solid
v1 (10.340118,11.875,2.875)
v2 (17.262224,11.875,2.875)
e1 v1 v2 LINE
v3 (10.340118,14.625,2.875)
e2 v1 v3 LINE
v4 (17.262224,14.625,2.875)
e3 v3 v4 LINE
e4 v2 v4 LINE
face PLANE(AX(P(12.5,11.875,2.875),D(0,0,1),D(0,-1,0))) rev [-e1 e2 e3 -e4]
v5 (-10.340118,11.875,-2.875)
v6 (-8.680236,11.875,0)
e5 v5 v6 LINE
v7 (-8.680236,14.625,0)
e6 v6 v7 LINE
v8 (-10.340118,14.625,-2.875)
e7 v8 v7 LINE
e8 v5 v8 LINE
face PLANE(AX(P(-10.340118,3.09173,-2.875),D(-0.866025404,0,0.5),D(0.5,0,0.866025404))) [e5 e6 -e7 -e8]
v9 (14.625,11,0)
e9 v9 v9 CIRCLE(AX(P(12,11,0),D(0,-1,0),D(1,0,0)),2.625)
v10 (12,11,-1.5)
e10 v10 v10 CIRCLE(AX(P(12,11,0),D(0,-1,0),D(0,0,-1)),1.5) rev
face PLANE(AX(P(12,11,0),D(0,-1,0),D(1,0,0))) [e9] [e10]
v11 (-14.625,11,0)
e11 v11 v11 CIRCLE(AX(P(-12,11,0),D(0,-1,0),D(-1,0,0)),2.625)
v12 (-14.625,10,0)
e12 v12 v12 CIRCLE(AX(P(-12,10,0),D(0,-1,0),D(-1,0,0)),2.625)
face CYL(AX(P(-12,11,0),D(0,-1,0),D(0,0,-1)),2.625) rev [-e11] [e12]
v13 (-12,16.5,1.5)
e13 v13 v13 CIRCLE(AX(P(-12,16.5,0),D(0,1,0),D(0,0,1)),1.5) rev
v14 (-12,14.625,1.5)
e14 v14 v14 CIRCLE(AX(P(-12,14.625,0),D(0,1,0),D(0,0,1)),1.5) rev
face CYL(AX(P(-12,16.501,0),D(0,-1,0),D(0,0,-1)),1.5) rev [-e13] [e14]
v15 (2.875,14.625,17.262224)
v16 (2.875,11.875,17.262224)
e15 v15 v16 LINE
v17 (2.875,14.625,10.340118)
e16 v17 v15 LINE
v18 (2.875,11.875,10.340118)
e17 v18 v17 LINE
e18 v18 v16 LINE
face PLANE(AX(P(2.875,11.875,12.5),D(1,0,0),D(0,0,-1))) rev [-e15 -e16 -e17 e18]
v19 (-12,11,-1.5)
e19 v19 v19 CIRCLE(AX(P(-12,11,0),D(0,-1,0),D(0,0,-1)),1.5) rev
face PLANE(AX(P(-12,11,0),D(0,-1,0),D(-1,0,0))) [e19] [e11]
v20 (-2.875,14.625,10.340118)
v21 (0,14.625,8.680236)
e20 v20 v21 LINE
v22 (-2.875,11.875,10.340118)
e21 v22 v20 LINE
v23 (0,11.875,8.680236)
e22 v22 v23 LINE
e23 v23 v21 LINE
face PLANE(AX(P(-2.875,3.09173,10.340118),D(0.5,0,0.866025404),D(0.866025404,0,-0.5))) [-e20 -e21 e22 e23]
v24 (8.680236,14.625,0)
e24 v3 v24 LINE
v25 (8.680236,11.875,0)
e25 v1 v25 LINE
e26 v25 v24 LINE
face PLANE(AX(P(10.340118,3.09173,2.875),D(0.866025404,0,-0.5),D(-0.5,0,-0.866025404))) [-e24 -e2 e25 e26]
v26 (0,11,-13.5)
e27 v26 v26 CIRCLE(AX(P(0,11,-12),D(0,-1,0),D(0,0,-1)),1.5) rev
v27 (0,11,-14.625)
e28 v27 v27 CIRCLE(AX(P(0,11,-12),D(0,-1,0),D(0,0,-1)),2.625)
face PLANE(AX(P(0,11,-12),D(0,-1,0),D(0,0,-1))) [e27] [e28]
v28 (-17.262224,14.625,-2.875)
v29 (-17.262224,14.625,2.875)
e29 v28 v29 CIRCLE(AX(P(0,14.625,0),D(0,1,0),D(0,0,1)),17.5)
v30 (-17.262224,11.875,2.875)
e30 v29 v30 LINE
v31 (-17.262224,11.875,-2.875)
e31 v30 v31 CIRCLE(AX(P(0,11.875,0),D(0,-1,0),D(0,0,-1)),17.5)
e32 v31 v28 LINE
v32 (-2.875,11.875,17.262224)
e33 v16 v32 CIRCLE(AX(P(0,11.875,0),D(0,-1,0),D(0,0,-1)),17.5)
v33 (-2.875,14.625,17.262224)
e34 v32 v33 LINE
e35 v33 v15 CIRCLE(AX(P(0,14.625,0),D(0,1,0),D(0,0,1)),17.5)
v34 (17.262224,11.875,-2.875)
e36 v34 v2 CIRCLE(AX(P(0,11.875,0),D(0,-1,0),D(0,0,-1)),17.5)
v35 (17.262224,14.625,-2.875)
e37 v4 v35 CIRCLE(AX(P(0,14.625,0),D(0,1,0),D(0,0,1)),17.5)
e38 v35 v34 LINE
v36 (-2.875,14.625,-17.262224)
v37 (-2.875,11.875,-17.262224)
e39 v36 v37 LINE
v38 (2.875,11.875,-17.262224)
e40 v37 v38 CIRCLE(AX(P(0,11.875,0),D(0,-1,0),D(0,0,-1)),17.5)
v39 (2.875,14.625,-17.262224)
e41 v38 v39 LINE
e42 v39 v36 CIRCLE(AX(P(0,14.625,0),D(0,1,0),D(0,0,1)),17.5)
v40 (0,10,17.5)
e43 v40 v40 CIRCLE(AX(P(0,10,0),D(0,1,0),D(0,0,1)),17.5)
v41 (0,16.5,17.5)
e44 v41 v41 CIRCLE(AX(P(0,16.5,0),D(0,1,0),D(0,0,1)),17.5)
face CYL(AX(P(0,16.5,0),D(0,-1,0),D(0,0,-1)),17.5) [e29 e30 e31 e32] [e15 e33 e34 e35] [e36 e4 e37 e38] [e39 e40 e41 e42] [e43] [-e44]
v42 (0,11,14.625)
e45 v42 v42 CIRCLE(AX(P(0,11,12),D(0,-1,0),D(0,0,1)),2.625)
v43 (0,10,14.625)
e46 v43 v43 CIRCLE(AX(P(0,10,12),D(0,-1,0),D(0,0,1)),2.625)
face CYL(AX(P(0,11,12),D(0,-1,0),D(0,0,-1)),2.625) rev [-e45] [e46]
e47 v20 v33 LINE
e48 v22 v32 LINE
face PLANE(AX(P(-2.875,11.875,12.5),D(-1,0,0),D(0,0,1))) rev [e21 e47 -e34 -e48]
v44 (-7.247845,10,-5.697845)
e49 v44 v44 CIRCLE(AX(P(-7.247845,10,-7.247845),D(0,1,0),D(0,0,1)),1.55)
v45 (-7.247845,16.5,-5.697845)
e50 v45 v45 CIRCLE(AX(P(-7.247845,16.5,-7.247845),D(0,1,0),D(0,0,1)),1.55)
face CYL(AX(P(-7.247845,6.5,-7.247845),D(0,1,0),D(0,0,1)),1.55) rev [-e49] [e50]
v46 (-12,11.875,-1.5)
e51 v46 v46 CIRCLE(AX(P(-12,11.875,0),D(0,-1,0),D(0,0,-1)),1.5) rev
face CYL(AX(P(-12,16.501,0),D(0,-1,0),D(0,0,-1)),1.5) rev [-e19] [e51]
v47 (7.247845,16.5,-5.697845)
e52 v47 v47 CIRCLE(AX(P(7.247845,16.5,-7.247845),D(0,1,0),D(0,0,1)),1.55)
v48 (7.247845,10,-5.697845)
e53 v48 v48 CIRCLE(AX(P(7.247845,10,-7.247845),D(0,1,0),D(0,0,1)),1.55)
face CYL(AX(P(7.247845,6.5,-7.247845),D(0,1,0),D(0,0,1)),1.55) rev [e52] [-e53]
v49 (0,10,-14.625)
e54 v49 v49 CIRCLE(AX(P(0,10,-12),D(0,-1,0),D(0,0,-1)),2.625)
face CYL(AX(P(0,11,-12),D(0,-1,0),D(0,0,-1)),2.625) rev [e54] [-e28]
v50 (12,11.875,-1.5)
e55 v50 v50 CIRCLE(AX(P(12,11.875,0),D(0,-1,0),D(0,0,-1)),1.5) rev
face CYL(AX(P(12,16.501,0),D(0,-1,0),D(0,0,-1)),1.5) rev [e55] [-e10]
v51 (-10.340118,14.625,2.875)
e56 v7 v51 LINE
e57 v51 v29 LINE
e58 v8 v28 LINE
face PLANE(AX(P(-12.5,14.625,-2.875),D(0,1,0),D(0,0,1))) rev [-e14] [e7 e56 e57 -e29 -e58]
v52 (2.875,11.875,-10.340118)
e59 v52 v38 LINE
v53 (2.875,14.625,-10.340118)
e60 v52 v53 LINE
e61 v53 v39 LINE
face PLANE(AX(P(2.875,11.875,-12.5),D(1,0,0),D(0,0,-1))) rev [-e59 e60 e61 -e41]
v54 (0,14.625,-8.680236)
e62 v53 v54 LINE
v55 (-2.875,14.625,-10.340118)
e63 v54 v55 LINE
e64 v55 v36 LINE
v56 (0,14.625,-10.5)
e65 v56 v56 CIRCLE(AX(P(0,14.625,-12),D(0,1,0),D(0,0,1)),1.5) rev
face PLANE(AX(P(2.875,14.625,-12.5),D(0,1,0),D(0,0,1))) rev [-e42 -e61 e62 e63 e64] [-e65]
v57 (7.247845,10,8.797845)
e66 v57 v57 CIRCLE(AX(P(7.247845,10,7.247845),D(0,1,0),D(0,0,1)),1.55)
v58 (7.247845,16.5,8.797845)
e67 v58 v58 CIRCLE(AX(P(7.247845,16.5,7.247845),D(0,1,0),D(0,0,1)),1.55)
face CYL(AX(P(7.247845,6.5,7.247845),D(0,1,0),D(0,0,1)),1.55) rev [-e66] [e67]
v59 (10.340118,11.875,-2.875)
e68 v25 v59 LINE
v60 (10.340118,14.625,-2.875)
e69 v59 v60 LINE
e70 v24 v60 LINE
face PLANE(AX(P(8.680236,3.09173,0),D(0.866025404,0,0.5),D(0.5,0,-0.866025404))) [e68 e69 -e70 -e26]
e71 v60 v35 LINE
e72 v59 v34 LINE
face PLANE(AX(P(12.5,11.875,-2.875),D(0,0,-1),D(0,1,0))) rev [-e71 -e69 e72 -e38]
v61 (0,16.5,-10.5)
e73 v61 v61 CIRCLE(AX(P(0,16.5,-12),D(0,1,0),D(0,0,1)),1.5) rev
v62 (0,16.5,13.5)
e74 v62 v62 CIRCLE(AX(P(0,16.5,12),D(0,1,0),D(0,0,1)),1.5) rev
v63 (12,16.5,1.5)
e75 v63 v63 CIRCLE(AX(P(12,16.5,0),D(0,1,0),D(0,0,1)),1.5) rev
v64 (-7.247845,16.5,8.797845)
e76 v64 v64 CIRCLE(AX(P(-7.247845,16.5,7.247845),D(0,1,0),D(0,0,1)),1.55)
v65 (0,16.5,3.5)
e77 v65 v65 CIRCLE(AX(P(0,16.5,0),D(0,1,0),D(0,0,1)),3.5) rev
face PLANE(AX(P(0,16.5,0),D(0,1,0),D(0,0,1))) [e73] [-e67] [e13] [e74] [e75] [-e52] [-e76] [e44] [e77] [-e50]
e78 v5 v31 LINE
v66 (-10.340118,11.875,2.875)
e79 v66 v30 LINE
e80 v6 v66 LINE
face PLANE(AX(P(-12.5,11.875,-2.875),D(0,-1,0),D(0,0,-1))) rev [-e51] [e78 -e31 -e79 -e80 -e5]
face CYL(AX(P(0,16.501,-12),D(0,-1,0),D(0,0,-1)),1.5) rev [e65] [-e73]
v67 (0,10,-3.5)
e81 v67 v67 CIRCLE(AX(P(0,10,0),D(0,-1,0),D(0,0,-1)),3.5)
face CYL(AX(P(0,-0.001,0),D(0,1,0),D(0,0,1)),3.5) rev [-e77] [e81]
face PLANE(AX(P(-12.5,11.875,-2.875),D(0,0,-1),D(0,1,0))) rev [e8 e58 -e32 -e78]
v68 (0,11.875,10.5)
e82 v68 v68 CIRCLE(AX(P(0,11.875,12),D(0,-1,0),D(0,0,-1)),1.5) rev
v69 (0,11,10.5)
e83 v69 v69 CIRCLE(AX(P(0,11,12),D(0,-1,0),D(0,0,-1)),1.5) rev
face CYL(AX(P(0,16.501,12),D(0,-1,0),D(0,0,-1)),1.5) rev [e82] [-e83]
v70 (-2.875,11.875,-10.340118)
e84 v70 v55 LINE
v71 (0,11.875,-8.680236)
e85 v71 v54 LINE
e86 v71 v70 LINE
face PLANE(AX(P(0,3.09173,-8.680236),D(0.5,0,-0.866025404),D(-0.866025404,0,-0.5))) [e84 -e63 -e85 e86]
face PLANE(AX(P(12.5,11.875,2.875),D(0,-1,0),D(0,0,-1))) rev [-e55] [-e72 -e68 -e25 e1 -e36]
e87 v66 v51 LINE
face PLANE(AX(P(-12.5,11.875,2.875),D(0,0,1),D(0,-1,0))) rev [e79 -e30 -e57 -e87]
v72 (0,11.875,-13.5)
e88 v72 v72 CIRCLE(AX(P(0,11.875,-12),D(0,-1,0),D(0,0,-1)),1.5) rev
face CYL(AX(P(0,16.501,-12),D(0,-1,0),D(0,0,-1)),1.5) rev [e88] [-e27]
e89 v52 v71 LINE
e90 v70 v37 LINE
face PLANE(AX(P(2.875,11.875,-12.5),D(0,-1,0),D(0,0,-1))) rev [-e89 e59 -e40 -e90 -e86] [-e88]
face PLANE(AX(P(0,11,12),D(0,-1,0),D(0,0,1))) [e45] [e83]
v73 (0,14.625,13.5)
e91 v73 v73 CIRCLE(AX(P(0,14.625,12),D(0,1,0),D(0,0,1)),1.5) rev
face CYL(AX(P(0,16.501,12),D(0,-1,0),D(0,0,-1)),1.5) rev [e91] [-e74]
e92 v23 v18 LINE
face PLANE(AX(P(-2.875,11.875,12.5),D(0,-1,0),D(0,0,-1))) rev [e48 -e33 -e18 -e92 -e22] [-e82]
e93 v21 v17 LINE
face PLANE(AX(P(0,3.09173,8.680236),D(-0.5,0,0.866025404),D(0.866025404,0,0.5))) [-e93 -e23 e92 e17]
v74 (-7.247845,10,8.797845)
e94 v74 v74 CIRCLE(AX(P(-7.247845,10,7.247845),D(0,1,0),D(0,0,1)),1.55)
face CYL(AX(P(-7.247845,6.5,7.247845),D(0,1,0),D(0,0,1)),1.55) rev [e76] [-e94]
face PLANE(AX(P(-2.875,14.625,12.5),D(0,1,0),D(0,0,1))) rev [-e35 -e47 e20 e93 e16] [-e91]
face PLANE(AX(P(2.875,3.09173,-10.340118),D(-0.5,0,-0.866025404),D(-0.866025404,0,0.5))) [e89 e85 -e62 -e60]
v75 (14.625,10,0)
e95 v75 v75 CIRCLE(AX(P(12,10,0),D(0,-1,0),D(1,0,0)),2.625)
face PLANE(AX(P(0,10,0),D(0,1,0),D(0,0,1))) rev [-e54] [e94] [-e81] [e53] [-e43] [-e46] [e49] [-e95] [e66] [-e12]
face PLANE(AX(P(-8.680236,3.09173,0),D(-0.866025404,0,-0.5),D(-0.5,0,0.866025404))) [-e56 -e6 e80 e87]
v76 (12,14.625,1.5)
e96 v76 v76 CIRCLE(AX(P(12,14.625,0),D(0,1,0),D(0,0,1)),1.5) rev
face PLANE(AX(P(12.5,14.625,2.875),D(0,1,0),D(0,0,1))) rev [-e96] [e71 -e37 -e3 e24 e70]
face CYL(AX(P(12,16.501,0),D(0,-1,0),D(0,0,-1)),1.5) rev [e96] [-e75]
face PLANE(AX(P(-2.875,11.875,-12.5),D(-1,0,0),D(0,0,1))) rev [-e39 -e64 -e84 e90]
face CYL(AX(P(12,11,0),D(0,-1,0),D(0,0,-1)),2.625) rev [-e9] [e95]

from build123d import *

# Parameters (mm, degrees)
SKETCH1_R                      = 6.05
SKETCH1_R_2                    = 3.05
BOSS_EXTRUDE1_DEPTH            = 10
SKETCH2_R                      = 17.5
BOSS_EXTRUDE2_DEPTH            = 6.5
CUT_EXTRUDE1_REACH             = 28.693
SKETCH3_R                      = 1.5
CUT_EXTRUDE2_DEPTH             = 30.744747435
CUT_EXTRUDE2_DEPTH_BACK        = 30.744747435
SKETCH4_R                      = 1.5
CUT_EXTRUDE3_REACH             = 28.693
SKETCH6_R                      = 3.5
CUT_EXTRUDE3_DIRECTION_2_REACH = 28.693
SKETCH8_W                      = 5.75
SKETCH8_H                      = 2.75
CUT_EXTRUDE4_DEPTH             = 5
CUT_EXTRUDE5_DEPTH             = 2.75
CIRPATTERN1_START              = 11.875
CIRPATTERN1_OUTLINE_R          = 1.5
CIRPATTERN1_DEPTH              = 2.75
SKETCH10_R                     = 6.05
CUT_EXTRUDE6_DEPTH             = 10
SKETCH11_R                     = 1.55
CUT_EXTRUDE7_DEPTH             = 10
SKETCH12_R                     = 2.625
CUT_EXTRUDE8_DEPTH             = 1
CIRPATTERN2_COUNT              = 4


# Read off the part's stored shape, not the designer's step: CirPattern1
with BuildPart() as part:
    # Sketch1 → Boss-Extrude1 (new body)
    with BuildSketch(Plane(origin=(0, 0, 0), x_dir=(1, 0, 0), z_dir=(0, 1, 0))):
        with Locations(Location((0, 0, 0), (0, 0, 270))):
            Circle(SKETCH1_R)
        with Locations(Location((0, 0, 0), (0, 0, 270))):
            Circle(SKETCH1_R_2, mode=Mode.SUBTRACT)
    extrude(amount=BOSS_EXTRUDE1_DEPTH)

    # Sketch2 → Boss-Extrude2 (add)
    with BuildSketch(Plane(origin=(0, 10, 0), x_dir=(1, 0, 0), z_dir=(0, 1, 0))):
        with Locations(Location((0, 0, 0), (0, 0, 90))):
            Circle(SKETCH2_R)
    extrude(amount=BOSS_EXTRUDE2_DEPTH)

    # Sketch3 → Cut-Extrude1 (cut, up to next)
    with BuildSketch(Plane.XZ.offset(-10), mode=Mode.PRIVATE) as cut_extrude1_sk1:
        with Locations(Location((12, 0, 0), (0, 0, 270))):
            Circle(SKETCH3_R)
    cut_extrude1_tool1 = extrude(cut_extrude1_sk1.sketch, amount=-CUT_EXTRUDE1_REACH, mode=Mode.PRIVATE) & part.part
    # Sketch3 → Cut-Extrude1 (cut, up to next)
    with BuildSketch(Plane.XZ.offset(-10), mode=Mode.PRIVATE) as cut_extrude1_sk2:
        with Locations(Location((0, -12, 0), (0, 0, 270))):
            Circle(SKETCH3_R)
    cut_extrude1_tool2 = extrude(cut_extrude1_sk2.sketch, amount=-CUT_EXTRUDE1_REACH, mode=Mode.PRIVATE) & part.part
    # Sketch3 → Cut-Extrude1 (cut, up to next)
    with BuildSketch(Plane.XZ.offset(-10), mode=Mode.PRIVATE) as cut_extrude1_sk3:
        with Locations(Location((-12, 0, 0), (0, 0, 270))):
            Circle(SKETCH3_R)
    cut_extrude1_tool3 = extrude(cut_extrude1_sk3.sketch, amount=-CUT_EXTRUDE1_REACH, mode=Mode.PRIVATE) & part.part
    # Sketch3 → Cut-Extrude1 (cut, up to next)
    with BuildSketch(Plane.XZ.offset(-10), mode=Mode.PRIVATE) as cut_extrude1_sk4:
        with Locations(Location((0, 12, 0), (0, 0, 270))):
            Circle(SKETCH3_R)
    cut_extrude1_tool4 = extrude(cut_extrude1_sk4.sketch, amount=-CUT_EXTRUDE1_REACH, mode=Mode.PRIVATE) & part.part
    add(cut_extrude1_tool1.solids().sort_by_distance((12, 10, 0))[0], mode=Mode.SUBTRACT)
    add(cut_extrude1_tool2.solids().sort_by_distance((0, 10, -12))[0], mode=Mode.SUBTRACT)
    add(cut_extrude1_tool3.solids().sort_by_distance((-12, 10, 0))[0], mode=Mode.SUBTRACT)
    add(cut_extrude1_tool4.solids().sort_by_distance((0, 10, 12))[0], mode=Mode.SUBTRACT)

    # Sketch4 → Cut-Extrude2 (cut, two sides: drawn at the far end of the back side and taken through both)
    with BuildSketch(Plane.XY.offset(-CUT_EXTRUDE2_DEPTH_BACK)):
        with Locations((0, 4.916404418)):
            Circle(SKETCH4_R)
    extrude(amount=CUT_EXTRUDE2_DEPTH + CUT_EXTRUDE2_DEPTH_BACK, mode=Mode.SUBTRACT)

    # Sketch6 → Cut-Extrude3 (cut, up to next)
    with BuildSketch(Plane(origin=(0, 10, 0), x_dir=(-1, 0, 0), z_dir=(0, -1, 0)), mode=Mode.PRIVATE) as cut_extrude3_sk1:
        with Locations(Location((0, 0, 0), (0, 0, 270))):
            Circle(SKETCH6_R)
    cut_extrude3_tool1 = extrude(cut_extrude3_sk1.sketch, amount=-CUT_EXTRUDE3_REACH, mode=Mode.PRIVATE) & part.part
    add(cut_extrude3_tool1.solids().sort_by_distance((0, 10, 0))[0], mode=Mode.SUBTRACT)

    # Sketch6 → Cut-Extrude3 direction 2 (cut, up to next)
    with BuildSketch(Plane(origin=(0, 10, 0), x_dir=(-1, 0, 0), z_dir=(0, -1, 0)), mode=Mode.PRIVATE) as cut_extrude3_direction_2_sk1:
        with Locations(Location((0, 0, 0), (0, 0, 270))):
            Circle(SKETCH6_R)
    cut_extrude3_direction_2_tool1 = extrude(cut_extrude3_direction_2_sk1.sketch, amount=CUT_EXTRUDE3_DIRECTION_2_REACH, mode=Mode.PRIVATE) & part.part
    add(cut_extrude3_direction_2_tool1.solids().sort_by_distance((0, 10, 0))[0], mode=Mode.SUBTRACT)

    # Sketch8 → Cut-Extrude4 (cut)
    with BuildSketch(Plane(origin=(17.5, 0, 0), x_dir=(0, 0, -1), z_dir=(1, 0, 0))):
        with Locations((0, 13.25)):
            Rectangle(SKETCH8_W, SKETCH8_H)
    extrude(amount=-CUT_EXTRUDE4_DEPTH, mode=Mode.SUBTRACT)

    # Sketch9 → Cut-Extrude5 (cut)
    with BuildSketch(Plane.XZ.offset(-14.625)):
        Polygon((15.319764048, 0), (13.659882024, 2.875), (10.340117976, 2.875), (8.680235952, 0), (10.340117976, -2.875), (13.659882024, -2.875), align=None)
    extrude(amount=CUT_EXTRUDE5_DEPTH, mode=Mode.SUBTRACT)

    # CirPattern1 outline → CirPattern1 (cut)
    # profile 1 of 3: a face of its own
    with BuildSketch(Plane(origin=(0, 0, 0), x_dir=(1, 0, 0), z_dir=(0, 1, 0)).offset(CIRPATTERN1_START)):
        with BuildLine():
            Line((-8.680235952, 0), (-10.340117976, 2.875))
            Line((-10.340117976, 2.875), (-17.26222393, 2.875))
            ThreePointArc((-17.26222393, 2.875), (-17.5, 0), (-17.26222393, -2.875))
            Line((-17.26222393, -2.875), (-10.340117976, -2.875))
            Line((-10.340117976, -2.875), (-8.680235952, 0))
        make_face()
        with Locations((-12, 0)):
            Circle(CIRPATTERN1_OUTLINE_R, mode=Mode.SUBTRACT)
    # profile 2 of 3: a face of its own
    with BuildSketch(Plane(origin=(0, 0, 0), x_dir=(1, 0, 0), z_dir=(0, 1, 0)).offset(CIRPATTERN1_START)):
        with BuildLine():
            ThreePointArc((2.875, 17.26222393), (0, 17.5), (-2.875, 17.26222393))
            Line((-2.875, 17.26222393), (-2.875, 10.340117976))
            Line((-2.875, 10.340117976), (0, 8.680235952))
            Line((0, 8.680235952), (2.875, 10.340117976))
            Line((2.875, 10.340117976), (2.875, 17.26222393))
        make_face()
        with Locations((0, 12)):
            Circle(CIRPATTERN1_OUTLINE_R, mode=Mode.SUBTRACT)
    # profile 3 of 3: a face of its own
    with BuildSketch(Plane(origin=(0, 0, 0), x_dir=(1, 0, 0), z_dir=(0, 1, 0)).offset(CIRPATTERN1_START)):
        with BuildLine():
            Line((-2.875, -10.340117976), (-2.875, -17.26222393))
            ThreePointArc((-2.875, -17.26222393), (0, -17.5), (2.875, -17.26222393))
            Line((2.875, -17.26222393), (2.875, -10.340117976))
            Line((2.875, -10.340117976), (0, -8.680235952))
            Line((0, -8.680235952), (-2.875, -10.340117976))
        make_face()
        with Locations((0, -12)):
            Circle(CIRPATTERN1_OUTLINE_R, mode=Mode.SUBTRACT)
    extrude(amount=CIRPATTERN1_DEPTH, mode=Mode.SUBTRACT)

    # Sketch10 → Cut-Extrude6 (cut)
    with BuildSketch(Plane.XZ):
        Circle(SKETCH10_R)
    extrude(amount=-CUT_EXTRUDE6_DEPTH, mode=Mode.SUBTRACT)

    # Sketch11 → Cut-Extrude7 (cut)
    with BuildSketch(Plane(origin=(0, 16.5, 0), x_dir=(1, 0, 0), z_dir=(0, 1, 0))):
        with Locations(Location((-7.247844507, -7.247844507, 0), (0, 0, 270))):
            Circle(SKETCH11_R)
        with Locations(Location((-7.247844507, 7.247844507, 0), (0, 0, 270))):
            Circle(SKETCH11_R)
        with Locations(Location((7.247844507, 7.247844507, 0), (0, 0, 270))):
            Circle(SKETCH11_R)
        with Locations(Location((7.247844507, -7.247844507, 0), (0, 0, 270))):
            Circle(SKETCH11_R)
    extrude(amount=-CUT_EXTRUDE7_DEPTH, mode=Mode.SUBTRACT)

    # Sketch12 → Cut-Extrude8 (cut)
    with BuildSketch(Plane.XZ.offset(-10)):
        with Locations(Location((0, -12, 0), (0, 0, 270))):
            Circle(SKETCH12_R)
    cut_extrude8 = extrude(amount=-CUT_EXTRUDE8_DEPTH, mode=Mode.SUBTRACT)

    # CirPattern2: Cut-Extrude8 ×4 about axis
    cirpattern2_axis = Axis((0, 0, 0), (0, 1, 0))
    for i in range(1, CIRPATTERN2_COUNT):
        add(cut_extrude8.rotate(cirpattern2_axis, i * 360 / CIRPATTERN2_COUNT), mode=Mode.SUBTRACT)


solid = part.part
